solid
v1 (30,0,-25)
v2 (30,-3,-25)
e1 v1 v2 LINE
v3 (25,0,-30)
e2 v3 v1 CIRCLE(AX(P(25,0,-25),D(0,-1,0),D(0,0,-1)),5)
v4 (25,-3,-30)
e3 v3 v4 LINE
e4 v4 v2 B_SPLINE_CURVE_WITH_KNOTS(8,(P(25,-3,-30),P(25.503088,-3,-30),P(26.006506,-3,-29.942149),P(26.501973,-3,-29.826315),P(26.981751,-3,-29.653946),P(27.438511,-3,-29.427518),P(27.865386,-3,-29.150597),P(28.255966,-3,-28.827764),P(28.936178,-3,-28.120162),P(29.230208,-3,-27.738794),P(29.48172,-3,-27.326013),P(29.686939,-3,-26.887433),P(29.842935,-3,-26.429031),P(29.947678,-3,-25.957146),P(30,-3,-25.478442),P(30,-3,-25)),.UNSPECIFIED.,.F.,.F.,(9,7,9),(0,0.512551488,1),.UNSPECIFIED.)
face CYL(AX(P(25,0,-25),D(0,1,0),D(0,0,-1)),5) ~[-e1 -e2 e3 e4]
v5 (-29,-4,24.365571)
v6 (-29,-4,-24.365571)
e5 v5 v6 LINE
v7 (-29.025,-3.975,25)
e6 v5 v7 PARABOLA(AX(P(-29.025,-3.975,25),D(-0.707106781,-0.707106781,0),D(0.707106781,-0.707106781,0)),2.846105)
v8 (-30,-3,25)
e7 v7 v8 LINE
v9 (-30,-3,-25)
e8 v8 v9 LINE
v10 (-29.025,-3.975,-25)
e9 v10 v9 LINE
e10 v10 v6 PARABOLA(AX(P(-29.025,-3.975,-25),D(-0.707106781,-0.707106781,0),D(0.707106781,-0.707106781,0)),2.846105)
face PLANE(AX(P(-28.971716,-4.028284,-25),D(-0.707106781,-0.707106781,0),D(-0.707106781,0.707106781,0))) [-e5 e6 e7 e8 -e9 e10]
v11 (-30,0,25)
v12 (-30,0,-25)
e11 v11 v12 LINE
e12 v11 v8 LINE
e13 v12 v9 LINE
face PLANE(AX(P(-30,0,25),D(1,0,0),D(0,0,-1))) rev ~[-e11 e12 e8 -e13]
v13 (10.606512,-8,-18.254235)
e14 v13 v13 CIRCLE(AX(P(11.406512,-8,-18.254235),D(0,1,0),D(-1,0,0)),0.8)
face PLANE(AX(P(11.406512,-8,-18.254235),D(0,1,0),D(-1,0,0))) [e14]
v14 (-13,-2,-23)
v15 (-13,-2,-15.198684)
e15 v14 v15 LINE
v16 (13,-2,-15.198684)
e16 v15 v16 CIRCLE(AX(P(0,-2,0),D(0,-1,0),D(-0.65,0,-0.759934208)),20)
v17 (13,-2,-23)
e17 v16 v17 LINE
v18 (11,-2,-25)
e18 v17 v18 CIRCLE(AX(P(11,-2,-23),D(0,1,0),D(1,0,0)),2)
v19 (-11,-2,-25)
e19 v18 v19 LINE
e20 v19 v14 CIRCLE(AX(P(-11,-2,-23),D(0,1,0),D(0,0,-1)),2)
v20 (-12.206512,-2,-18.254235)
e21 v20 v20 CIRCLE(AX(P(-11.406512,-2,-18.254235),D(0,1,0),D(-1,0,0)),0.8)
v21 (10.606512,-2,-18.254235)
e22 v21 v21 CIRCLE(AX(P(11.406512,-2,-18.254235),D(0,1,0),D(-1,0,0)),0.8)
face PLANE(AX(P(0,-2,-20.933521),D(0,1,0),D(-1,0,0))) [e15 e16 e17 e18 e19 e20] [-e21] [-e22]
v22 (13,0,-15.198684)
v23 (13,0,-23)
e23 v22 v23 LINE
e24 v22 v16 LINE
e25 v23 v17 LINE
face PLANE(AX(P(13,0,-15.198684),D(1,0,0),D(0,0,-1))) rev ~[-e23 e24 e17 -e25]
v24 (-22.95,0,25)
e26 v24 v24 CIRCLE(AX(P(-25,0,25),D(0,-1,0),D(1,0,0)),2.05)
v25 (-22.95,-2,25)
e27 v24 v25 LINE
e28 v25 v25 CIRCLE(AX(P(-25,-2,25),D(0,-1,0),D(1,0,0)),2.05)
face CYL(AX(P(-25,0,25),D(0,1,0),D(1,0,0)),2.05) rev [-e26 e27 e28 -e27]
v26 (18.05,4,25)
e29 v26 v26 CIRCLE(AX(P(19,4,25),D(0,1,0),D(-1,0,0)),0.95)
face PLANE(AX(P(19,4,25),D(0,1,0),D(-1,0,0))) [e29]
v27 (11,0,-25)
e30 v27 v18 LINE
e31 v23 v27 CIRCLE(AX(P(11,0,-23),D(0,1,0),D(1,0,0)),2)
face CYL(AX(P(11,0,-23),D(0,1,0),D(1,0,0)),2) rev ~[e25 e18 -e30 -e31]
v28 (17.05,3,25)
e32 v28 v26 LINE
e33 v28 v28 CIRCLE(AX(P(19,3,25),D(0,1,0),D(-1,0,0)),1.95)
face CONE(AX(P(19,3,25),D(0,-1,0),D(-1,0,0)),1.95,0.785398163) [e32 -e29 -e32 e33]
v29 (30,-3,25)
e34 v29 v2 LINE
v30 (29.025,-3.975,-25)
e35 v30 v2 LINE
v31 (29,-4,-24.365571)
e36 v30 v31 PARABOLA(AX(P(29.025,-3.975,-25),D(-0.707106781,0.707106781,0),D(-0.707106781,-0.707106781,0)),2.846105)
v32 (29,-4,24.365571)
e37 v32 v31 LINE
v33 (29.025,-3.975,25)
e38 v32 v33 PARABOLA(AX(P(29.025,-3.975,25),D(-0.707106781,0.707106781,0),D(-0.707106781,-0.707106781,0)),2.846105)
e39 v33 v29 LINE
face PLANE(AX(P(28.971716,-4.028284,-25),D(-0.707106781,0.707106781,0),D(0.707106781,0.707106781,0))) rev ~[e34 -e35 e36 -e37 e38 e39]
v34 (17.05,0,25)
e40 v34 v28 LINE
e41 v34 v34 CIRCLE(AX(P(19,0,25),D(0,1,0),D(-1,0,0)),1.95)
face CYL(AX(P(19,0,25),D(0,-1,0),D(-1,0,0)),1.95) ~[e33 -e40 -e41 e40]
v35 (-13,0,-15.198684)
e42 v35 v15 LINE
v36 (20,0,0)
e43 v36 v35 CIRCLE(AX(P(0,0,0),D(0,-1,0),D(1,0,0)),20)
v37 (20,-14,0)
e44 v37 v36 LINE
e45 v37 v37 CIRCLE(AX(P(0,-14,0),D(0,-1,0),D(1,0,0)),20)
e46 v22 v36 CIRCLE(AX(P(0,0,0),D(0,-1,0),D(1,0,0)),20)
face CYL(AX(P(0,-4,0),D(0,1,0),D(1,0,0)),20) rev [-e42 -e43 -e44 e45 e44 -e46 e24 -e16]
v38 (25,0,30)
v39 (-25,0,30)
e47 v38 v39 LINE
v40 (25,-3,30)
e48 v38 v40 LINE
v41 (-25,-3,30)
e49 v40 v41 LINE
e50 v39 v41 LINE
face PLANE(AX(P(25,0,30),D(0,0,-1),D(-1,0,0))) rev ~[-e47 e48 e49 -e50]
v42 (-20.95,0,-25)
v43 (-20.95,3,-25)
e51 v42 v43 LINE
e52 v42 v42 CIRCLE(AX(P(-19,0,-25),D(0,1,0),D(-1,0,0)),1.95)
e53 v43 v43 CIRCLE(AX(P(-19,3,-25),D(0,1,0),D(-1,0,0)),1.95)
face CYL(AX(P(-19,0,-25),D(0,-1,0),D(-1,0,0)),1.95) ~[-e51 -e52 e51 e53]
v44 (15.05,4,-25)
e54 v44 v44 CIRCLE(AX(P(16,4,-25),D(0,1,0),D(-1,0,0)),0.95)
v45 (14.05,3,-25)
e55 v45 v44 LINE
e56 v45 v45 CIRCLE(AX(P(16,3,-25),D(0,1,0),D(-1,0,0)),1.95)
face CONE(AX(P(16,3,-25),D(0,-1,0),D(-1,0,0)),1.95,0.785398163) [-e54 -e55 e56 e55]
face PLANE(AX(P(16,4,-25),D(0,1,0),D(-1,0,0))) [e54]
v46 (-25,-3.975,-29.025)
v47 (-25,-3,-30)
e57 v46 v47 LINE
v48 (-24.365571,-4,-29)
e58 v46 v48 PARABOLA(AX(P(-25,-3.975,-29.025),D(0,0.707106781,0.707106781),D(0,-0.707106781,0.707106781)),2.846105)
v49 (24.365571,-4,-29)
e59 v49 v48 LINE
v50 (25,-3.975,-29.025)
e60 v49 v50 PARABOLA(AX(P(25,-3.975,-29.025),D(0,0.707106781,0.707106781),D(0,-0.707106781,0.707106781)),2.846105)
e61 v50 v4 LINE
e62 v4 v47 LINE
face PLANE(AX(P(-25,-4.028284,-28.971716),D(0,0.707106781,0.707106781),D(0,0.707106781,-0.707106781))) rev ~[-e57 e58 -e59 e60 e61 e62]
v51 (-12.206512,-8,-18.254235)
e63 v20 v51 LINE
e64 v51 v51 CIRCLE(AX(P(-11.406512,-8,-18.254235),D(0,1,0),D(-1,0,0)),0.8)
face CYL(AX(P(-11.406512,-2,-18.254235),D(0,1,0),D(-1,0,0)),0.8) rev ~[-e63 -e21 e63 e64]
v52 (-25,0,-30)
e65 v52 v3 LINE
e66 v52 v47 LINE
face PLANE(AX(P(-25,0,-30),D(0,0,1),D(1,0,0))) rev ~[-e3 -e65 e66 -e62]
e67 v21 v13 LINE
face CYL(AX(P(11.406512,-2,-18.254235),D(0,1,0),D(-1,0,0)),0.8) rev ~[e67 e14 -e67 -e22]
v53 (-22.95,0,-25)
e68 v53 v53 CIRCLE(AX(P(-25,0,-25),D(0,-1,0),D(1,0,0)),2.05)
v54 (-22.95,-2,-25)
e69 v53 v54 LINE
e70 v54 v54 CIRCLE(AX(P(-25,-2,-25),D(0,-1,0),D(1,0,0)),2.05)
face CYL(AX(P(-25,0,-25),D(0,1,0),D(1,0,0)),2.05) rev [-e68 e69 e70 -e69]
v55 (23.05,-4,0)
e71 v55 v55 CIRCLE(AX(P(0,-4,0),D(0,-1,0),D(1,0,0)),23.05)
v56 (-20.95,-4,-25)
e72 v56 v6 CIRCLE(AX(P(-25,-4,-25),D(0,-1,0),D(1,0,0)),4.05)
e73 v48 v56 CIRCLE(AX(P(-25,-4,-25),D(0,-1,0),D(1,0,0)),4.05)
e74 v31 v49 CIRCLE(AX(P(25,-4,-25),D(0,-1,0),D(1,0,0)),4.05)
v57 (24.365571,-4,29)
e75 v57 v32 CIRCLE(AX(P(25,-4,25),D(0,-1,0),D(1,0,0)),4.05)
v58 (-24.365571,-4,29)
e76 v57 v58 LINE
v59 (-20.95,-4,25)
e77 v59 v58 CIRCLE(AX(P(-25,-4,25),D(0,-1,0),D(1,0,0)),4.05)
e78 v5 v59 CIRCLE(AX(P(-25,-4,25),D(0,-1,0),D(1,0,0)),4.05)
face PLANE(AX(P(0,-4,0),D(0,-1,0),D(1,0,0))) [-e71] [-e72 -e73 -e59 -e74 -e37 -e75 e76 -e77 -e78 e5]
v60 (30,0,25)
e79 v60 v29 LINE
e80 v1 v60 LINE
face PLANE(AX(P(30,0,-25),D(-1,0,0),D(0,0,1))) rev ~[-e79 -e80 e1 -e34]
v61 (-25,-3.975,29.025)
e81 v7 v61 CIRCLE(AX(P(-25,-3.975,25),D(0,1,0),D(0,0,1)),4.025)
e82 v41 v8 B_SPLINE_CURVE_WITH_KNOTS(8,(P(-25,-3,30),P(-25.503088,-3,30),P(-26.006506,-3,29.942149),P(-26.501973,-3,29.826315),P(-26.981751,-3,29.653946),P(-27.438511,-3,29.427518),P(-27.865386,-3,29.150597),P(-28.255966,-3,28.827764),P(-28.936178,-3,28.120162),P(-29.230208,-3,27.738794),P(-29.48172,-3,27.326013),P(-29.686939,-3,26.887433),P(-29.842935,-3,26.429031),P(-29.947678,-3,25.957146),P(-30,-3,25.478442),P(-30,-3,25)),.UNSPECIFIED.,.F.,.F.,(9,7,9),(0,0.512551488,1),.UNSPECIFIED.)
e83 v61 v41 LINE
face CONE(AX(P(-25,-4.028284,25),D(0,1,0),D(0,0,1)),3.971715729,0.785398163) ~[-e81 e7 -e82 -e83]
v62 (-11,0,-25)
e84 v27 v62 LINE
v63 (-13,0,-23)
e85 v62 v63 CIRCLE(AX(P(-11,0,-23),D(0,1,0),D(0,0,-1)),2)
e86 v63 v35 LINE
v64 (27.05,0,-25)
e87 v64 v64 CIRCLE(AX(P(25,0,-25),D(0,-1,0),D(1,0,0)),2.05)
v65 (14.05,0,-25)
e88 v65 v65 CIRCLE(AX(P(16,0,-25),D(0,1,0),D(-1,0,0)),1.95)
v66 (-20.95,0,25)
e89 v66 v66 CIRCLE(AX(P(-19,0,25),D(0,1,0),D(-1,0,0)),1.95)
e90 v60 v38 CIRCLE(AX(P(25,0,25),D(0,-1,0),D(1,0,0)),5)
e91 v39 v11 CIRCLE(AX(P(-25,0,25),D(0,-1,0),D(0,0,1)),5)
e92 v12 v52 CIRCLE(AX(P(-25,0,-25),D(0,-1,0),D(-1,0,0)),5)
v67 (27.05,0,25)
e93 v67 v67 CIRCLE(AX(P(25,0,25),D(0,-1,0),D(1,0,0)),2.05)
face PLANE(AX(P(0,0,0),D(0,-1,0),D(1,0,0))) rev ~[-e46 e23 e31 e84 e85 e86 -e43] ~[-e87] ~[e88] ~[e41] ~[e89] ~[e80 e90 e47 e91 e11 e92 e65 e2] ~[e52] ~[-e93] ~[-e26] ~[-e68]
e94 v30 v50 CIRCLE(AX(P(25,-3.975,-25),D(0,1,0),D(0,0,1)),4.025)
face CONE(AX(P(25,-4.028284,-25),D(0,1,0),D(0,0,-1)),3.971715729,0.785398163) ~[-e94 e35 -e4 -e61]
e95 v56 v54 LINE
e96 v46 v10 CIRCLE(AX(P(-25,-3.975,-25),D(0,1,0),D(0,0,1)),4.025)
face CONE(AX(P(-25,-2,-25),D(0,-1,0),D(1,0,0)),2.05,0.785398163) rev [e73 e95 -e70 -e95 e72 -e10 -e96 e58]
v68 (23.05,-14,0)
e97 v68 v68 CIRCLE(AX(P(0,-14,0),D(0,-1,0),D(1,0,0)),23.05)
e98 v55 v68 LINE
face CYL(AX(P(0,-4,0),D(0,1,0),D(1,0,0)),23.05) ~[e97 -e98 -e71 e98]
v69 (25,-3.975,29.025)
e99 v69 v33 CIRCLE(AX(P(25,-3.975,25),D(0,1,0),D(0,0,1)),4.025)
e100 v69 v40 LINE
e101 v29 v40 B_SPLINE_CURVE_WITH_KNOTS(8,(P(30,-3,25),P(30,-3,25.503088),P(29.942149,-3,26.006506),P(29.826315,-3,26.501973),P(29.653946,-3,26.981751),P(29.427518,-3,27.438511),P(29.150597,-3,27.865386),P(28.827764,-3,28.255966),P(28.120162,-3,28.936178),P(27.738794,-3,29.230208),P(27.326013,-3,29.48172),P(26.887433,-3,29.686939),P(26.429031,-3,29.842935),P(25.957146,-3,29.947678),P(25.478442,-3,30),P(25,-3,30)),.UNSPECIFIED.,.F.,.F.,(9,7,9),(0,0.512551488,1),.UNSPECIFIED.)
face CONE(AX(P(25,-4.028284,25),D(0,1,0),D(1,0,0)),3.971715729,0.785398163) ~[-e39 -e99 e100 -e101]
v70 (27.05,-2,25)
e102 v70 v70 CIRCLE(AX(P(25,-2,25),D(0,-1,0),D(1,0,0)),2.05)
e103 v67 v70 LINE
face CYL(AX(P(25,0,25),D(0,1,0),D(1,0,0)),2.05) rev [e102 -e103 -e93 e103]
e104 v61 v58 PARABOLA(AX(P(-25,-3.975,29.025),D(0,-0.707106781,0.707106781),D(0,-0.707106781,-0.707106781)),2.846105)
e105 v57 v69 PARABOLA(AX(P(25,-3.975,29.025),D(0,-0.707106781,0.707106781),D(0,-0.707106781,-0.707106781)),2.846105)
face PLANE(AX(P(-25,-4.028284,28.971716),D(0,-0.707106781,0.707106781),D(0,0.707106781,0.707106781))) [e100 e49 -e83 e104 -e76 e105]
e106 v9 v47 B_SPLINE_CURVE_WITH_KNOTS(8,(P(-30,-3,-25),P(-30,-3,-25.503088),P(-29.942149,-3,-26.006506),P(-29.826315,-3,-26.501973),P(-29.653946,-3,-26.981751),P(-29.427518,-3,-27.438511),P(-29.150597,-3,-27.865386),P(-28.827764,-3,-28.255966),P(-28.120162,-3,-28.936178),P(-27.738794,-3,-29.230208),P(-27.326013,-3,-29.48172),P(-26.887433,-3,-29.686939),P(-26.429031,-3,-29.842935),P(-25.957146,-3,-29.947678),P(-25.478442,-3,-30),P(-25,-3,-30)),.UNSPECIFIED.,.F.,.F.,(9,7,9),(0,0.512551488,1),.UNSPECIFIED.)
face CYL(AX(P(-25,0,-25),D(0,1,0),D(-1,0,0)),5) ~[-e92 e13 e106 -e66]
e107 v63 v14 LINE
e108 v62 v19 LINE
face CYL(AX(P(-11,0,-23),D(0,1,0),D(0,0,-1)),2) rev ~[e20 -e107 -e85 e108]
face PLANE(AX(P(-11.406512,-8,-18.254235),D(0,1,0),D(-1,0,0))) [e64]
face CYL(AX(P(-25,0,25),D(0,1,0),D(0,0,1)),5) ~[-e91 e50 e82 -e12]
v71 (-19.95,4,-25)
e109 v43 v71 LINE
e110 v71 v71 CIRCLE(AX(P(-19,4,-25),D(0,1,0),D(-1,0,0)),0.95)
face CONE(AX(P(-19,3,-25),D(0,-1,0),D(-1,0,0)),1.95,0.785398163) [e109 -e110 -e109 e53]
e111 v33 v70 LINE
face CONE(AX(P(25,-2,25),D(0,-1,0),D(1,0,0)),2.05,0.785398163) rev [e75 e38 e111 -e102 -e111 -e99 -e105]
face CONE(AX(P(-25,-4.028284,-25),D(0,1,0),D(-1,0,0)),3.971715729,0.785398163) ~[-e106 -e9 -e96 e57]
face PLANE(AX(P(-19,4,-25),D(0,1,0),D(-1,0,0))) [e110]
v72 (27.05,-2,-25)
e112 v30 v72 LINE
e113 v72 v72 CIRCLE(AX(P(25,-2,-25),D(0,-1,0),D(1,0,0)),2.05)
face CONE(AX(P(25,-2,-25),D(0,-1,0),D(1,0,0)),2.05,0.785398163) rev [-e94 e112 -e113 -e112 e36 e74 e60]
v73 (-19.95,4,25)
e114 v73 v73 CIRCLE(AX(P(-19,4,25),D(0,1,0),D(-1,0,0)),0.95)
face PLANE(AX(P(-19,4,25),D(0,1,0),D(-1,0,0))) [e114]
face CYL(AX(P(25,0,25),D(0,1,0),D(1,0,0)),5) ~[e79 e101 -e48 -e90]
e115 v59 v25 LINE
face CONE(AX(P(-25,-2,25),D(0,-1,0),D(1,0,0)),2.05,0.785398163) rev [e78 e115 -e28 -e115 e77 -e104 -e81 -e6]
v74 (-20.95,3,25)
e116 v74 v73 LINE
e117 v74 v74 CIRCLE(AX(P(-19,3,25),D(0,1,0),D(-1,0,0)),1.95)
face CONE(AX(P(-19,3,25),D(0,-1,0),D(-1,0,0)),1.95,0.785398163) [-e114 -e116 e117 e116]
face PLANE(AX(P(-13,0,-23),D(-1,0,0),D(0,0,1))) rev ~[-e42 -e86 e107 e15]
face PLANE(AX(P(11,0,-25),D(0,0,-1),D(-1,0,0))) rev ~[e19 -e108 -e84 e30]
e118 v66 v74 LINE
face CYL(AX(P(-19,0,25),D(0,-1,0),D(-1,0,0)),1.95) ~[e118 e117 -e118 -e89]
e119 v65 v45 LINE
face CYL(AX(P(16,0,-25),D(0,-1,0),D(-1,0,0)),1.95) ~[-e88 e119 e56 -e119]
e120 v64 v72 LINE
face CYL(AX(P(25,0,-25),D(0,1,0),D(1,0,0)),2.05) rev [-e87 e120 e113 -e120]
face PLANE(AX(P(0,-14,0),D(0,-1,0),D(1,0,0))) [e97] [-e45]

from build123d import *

# Parameters (mm, degrees)
F0_R          = 2.05
F0_R_2        = 20
F1_DEPTH      = 4
F2_R          = 1.95
F3_DEPTH      = 4
F4_SIZE       = 1
F5_R          = 23.05
F5_R_2        = 20
F6_DEPTH      = 10
F8_DEPTH      = 2
F9_R          = 0.8
F10_DEPTH     = 6
F11_SIZE      = 2
F12_T1_DEPTH  = 50
F12_T3_DEPTH  = 50
F12_T6_ANGLE  = 90
F12_T8_ANGLE  = 90
F12_T10_ANGLE = 90
F12_T12_ANGLE = 90


# Not quite as in the source:
# - a fillet or chamfer that OpenCascade refuses, or shapes differently, is made with other operations: its cross-section is extruded or revolved along the edge and cut away or added


with BuildPart() as f1:
    # F0 (on Front) → F1 (new body)
    with BuildSketch(Plane.XZ):
        with BuildLine():
            ThreePointArc((30, 25), (28.5355339059, 28.5355339059), (25, 30))
            Line((25, 30), (-25, 30))
            ThreePointArc((-25, 30), (-28.5355339059, 28.5355339059), (-30, 25))
            Line((-30, 25), (-30, -25))
            ThreePointArc((-30, -25), (-28.5355339059, -28.5355339059), (-25, -30))
            Line((-25, -30), (25, -30))
            ThreePointArc((25, -30), (28.5355339059, -28.5355339059), (30, -25))
            Line((30, -25), (30, 25))
        make_face()
        with Locations((-25, -25)):
            Circle(F0_R, mode=Mode.SUBTRACT)
        with Locations((25, -25)):
            Circle(F0_R, mode=Mode.SUBTRACT)
        Circle(F0_R_2, mode=Mode.SUBTRACT)
        with Locations((-25, 25)):
            Circle(F0_R, mode=Mode.SUBTRACT)
        with Locations((25, 25)):
            Circle(F0_R, mode=Mode.SUBTRACT)
    extrude(amount=F1_DEPTH)

    # F2 (on face) → F3 (join)
    with BuildSketch(Plane(origin=(0, 0, 0), x_dir=(-1, 0, 0), z_dir=(0, 1, 0))):
        with Locations((-19, 25)):
            Circle(F2_R)
        with Locations((19, 25)):
            Circle(F2_R)
        with Locations((19, -25)):
            Circle(F2_R)
        with Locations((-16, -25)):
            Circle(F2_R)
    extrude(amount=F3_DEPTH)

    # F4
    f4_edges = [f1.edges().sort_by_distance(p)[0] for p in [
        (17.95, 4, -25),
        (-17.05, 4, -25),
        (-17.05, 4, 25),
        (20.95, 4, 25),
    ]]
    chamfer(f4_edges, length=F4_SIZE)

    # F5 (on face) → F6 (join)
    with BuildSketch(Plane.XZ.offset(4)):
        Circle(F5_R)
        Circle(F5_R_2, mode=Mode.SUBTRACT)
    extrude(amount=F6_DEPTH)

    # F7 (on face) → F8 (cut)
    with BuildSketch(Plane(origin=(0, 0, 0), x_dir=(-1, 0, 0), z_dir=(0, 1, 0))):
        with BuildLine():
            ThreePointArc((13, -15.1986841536), (0, -20), (-13, -15.1986841536))
            Line((-13, -15.1986841536), (-13, -23))
            ThreePointArc((-13, -23), (-12.4142135624, -24.4142135624), (-11, -25))
            Line((-11, -25), (11, -25))
            ThreePointArc((11, -25), (12.4142135624, -24.4142135624), (13, -23))
            Line((13, -23), (13, -15.1986841536))
        make_face()
    extrude(amount=-F8_DEPTH, mode=Mode.SUBTRACT)

    # F9 (on face) → F10 (cut)
    with BuildSketch(Plane(origin=(0, -2, 0), x_dir=(-1, 0, 0), z_dir=(0, 1, 0))):
        with Locations((-11.4065121626, -18.2542352698)):
            Circle(F9_R)
        with Locations((11.4065121626, -18.2542352698)):
            Circle(F9_R)
    extrude(amount=-F10_DEPTH, mode=Mode.SUBTRACT)

    # F11
    f11_edges = [f1.edges().sort_by_distance(p)[0] for p in [
        (22.95, -4, 25),
        (-27.05, -4, 25),
        (-27.05, -4, -25),
        (22.95, -4, -25),
    ]]
    chamfer(f11_edges, length=F11_SIZE)

    # F12: chamfer of 1 on 8 edges, made by hand

    # F12_s2 → F12_t1 (cut)
    with BuildSketch(Plane.XY.offset(-25)):
        with BuildLine():
            Line((28.9717157288, -4.0282842712), (30.0282842712, -2.9717157288))
            Line((30.0282842712, -2.9717157288), (30.0482842712, -2.9717157288))
            ThreePointArc((30.0482842712, -2.9717157288), (30.02, -3.4858578644), (30.02, -4))
            Line((30.02, -4), (30, -4.02))
            ThreePointArc((30, -4.02), (29.4858578644, -4.02), (28.9717157288, -4.0482842712))
            Line((28.9717157288, -4.0482842712), (28.9717157288, -4.0282842712))
        make_face()
        with BuildLine():
            Line((-28.9717157288, -4.0282842712), (-30.0282842712, -2.9717157288))
            Line((-30.0282842712, -2.9717157288), (-30.0482842712, -2.9717157288))
            ThreePointArc((-30.0482842712, -2.9717157288), (-30.02, -3.4858578644), (-30.02, -4))
            Line((-30.02, -4), (-30, -4.02))
            ThreePointArc((-30, -4.02), (-29.4858578644, -4.02), (-28.9717157288, -4.0482842712))
            Line((-28.9717157288, -4.0482842712), (-28.9717157288, -4.0282842712))
        make_face()
    extrude(amount=F12_T1_DEPTH, mode=Mode.SUBTRACT)

    # F12_s4 → F12_t3 (cut)
    with BuildSketch(Plane.YZ.offset(-25)):
        with BuildLine():
            Line((-4.0282842712, 28.9717157288), (-2.9717157288, 30.0282842712))
            Line((-2.9717157288, 30.0282842712), (-2.9717157288, 30.0482842712))
            ThreePointArc((-2.9717157288, 30.0482842712), (-3.4858578644, 30.02), (-4, 30.02))
            Line((-4, 30.02), (-4.02, 30))
            ThreePointArc((-4.02, 30), (-4.02, 29.4858578644), (-4.0482842712, 28.9717157288))
            Line((-4.0482842712, 28.9717157288), (-4.0282842712, 28.9717157288))
        make_face()
        with BuildLine():
            Line((-4.0282842712, -28.9717157288), (-2.9717157288, -30.0282842712))
            Line((-2.9717157288, -30.0282842712), (-2.9717157288, -30.0482842712))
            ThreePointArc((-2.9717157288, -30.0482842712), (-3.4858578644, -30.02), (-4, -30.02))
            Line((-4, -30.02), (-4.02, -30))
            ThreePointArc((-4.02, -30), (-4.02, -29.4858578644), (-4.0482842712, -28.9717157288))
            Line((-4.0482842712, -28.9717157288), (-4.0282842712, -28.9717157288))
        make_face()
    extrude(amount=F12_T3_DEPTH, mode=Mode.SUBTRACT)

    # F12_s5 → F12_t6 (revolve, cut)
    with BuildSketch(Plane.XY.offset(25)):
        with BuildLine():
            Line((28.9717157288, -4.0282842712), (30.0282842712, -2.9717157288))
            Line((30.0282842712, -2.9717157288), (30.0482842712, -2.9717157288))
            ThreePointArc((30.0482842712, -2.9717157288), (30.02, -3.4858578644), (30.02, -4))
            Line((30.02, -4), (30, -4.02))
            ThreePointArc((30, -4.02), (29.4858578644, -4.02), (28.9717157288, -4.0482842712))
            Line((28.9717157288, -4.0482842712), (28.9717157288, -4.0282842712))
        make_face()
    revolve(axis=Axis((25, -4, 25), (0, -1, 0)), revolution_arc=F12_T6_ANGLE, mode=Mode.SUBTRACT)

    # F12_s7 → F12_t8 (revolve, cut)
    with BuildSketch(Plane.YZ.offset(-25)):
        with BuildLine():
            Line((-4.0282842712, 28.9717157288), (-2.9717157288, 30.0282842712))
            Line((-2.9717157288, 30.0282842712), (-2.9717157288, 30.0482842712))
            ThreePointArc((-2.9717157288, 30.0482842712), (-3.4858578644, 30.02), (-4, 30.02))
            Line((-4, 30.02), (-4.02, 30))
            ThreePointArc((-4.02, 30), (-4.02, 29.4858578644), (-4.0482842712, 28.9717157288))
            Line((-4.0482842712, 28.9717157288), (-4.0282842712, 28.9717157288))
        make_face()
    revolve(axis=Axis((-25, -4, 25), (0, -1, 0)), revolution_arc=F12_T8_ANGLE, mode=Mode.SUBTRACT)

    # F12_s9 → F12_t10 (revolve, cut)
    with BuildSketch(Plane.XY.offset(-25)):
        with BuildLine():
            Line((-28.9717157288, -4.0282842712), (-30.0282842712, -2.9717157288))
            Line((-30.0282842712, -2.9717157288), (-30.0482842712, -2.9717157288))
            ThreePointArc((-30.0482842712, -2.9717157288), (-30.02, -3.4858578644), (-30.02, -4))
            Line((-30.02, -4), (-30, -4.02))
            ThreePointArc((-30, -4.02), (-29.4858578644, -4.02), (-28.9717157288, -4.0482842712))
            Line((-28.9717157288, -4.0482842712), (-28.9717157288, -4.0282842712))
        make_face()
    revolve(axis=Axis((-25, -4, -25), (0, -1, 0)), revolution_arc=F12_T10_ANGLE, mode=Mode.SUBTRACT)

    # F12_s11 → F12_t12 (revolve, cut)
    with BuildSketch(Plane.YZ.offset(25)):
        with BuildLine():
            Line((-4.0282842712, -28.9717157288), (-2.9717157288, -30.0282842712))
            Line((-2.9717157288, -30.0282842712), (-2.9717157288, -30.0482842712))
            ThreePointArc((-2.9717157288, -30.0482842712), (-3.4858578644, -30.02), (-4, -30.02))
            Line((-4, -30.02), (-4.02, -30))
            ThreePointArc((-4.02, -30), (-4.02, -29.4858578644), (-4.0482842712, -28.9717157288))
            Line((-4.0482842712, -28.9717157288), (-4.0282842712, -28.9717157288))
        make_face()
    revolve(axis=Axis((25, -4, -25), (0, -1, 0)), revolution_arc=F12_T12_ANGLE, mode=Mode.SUBTRACT)


solid = f1.part
